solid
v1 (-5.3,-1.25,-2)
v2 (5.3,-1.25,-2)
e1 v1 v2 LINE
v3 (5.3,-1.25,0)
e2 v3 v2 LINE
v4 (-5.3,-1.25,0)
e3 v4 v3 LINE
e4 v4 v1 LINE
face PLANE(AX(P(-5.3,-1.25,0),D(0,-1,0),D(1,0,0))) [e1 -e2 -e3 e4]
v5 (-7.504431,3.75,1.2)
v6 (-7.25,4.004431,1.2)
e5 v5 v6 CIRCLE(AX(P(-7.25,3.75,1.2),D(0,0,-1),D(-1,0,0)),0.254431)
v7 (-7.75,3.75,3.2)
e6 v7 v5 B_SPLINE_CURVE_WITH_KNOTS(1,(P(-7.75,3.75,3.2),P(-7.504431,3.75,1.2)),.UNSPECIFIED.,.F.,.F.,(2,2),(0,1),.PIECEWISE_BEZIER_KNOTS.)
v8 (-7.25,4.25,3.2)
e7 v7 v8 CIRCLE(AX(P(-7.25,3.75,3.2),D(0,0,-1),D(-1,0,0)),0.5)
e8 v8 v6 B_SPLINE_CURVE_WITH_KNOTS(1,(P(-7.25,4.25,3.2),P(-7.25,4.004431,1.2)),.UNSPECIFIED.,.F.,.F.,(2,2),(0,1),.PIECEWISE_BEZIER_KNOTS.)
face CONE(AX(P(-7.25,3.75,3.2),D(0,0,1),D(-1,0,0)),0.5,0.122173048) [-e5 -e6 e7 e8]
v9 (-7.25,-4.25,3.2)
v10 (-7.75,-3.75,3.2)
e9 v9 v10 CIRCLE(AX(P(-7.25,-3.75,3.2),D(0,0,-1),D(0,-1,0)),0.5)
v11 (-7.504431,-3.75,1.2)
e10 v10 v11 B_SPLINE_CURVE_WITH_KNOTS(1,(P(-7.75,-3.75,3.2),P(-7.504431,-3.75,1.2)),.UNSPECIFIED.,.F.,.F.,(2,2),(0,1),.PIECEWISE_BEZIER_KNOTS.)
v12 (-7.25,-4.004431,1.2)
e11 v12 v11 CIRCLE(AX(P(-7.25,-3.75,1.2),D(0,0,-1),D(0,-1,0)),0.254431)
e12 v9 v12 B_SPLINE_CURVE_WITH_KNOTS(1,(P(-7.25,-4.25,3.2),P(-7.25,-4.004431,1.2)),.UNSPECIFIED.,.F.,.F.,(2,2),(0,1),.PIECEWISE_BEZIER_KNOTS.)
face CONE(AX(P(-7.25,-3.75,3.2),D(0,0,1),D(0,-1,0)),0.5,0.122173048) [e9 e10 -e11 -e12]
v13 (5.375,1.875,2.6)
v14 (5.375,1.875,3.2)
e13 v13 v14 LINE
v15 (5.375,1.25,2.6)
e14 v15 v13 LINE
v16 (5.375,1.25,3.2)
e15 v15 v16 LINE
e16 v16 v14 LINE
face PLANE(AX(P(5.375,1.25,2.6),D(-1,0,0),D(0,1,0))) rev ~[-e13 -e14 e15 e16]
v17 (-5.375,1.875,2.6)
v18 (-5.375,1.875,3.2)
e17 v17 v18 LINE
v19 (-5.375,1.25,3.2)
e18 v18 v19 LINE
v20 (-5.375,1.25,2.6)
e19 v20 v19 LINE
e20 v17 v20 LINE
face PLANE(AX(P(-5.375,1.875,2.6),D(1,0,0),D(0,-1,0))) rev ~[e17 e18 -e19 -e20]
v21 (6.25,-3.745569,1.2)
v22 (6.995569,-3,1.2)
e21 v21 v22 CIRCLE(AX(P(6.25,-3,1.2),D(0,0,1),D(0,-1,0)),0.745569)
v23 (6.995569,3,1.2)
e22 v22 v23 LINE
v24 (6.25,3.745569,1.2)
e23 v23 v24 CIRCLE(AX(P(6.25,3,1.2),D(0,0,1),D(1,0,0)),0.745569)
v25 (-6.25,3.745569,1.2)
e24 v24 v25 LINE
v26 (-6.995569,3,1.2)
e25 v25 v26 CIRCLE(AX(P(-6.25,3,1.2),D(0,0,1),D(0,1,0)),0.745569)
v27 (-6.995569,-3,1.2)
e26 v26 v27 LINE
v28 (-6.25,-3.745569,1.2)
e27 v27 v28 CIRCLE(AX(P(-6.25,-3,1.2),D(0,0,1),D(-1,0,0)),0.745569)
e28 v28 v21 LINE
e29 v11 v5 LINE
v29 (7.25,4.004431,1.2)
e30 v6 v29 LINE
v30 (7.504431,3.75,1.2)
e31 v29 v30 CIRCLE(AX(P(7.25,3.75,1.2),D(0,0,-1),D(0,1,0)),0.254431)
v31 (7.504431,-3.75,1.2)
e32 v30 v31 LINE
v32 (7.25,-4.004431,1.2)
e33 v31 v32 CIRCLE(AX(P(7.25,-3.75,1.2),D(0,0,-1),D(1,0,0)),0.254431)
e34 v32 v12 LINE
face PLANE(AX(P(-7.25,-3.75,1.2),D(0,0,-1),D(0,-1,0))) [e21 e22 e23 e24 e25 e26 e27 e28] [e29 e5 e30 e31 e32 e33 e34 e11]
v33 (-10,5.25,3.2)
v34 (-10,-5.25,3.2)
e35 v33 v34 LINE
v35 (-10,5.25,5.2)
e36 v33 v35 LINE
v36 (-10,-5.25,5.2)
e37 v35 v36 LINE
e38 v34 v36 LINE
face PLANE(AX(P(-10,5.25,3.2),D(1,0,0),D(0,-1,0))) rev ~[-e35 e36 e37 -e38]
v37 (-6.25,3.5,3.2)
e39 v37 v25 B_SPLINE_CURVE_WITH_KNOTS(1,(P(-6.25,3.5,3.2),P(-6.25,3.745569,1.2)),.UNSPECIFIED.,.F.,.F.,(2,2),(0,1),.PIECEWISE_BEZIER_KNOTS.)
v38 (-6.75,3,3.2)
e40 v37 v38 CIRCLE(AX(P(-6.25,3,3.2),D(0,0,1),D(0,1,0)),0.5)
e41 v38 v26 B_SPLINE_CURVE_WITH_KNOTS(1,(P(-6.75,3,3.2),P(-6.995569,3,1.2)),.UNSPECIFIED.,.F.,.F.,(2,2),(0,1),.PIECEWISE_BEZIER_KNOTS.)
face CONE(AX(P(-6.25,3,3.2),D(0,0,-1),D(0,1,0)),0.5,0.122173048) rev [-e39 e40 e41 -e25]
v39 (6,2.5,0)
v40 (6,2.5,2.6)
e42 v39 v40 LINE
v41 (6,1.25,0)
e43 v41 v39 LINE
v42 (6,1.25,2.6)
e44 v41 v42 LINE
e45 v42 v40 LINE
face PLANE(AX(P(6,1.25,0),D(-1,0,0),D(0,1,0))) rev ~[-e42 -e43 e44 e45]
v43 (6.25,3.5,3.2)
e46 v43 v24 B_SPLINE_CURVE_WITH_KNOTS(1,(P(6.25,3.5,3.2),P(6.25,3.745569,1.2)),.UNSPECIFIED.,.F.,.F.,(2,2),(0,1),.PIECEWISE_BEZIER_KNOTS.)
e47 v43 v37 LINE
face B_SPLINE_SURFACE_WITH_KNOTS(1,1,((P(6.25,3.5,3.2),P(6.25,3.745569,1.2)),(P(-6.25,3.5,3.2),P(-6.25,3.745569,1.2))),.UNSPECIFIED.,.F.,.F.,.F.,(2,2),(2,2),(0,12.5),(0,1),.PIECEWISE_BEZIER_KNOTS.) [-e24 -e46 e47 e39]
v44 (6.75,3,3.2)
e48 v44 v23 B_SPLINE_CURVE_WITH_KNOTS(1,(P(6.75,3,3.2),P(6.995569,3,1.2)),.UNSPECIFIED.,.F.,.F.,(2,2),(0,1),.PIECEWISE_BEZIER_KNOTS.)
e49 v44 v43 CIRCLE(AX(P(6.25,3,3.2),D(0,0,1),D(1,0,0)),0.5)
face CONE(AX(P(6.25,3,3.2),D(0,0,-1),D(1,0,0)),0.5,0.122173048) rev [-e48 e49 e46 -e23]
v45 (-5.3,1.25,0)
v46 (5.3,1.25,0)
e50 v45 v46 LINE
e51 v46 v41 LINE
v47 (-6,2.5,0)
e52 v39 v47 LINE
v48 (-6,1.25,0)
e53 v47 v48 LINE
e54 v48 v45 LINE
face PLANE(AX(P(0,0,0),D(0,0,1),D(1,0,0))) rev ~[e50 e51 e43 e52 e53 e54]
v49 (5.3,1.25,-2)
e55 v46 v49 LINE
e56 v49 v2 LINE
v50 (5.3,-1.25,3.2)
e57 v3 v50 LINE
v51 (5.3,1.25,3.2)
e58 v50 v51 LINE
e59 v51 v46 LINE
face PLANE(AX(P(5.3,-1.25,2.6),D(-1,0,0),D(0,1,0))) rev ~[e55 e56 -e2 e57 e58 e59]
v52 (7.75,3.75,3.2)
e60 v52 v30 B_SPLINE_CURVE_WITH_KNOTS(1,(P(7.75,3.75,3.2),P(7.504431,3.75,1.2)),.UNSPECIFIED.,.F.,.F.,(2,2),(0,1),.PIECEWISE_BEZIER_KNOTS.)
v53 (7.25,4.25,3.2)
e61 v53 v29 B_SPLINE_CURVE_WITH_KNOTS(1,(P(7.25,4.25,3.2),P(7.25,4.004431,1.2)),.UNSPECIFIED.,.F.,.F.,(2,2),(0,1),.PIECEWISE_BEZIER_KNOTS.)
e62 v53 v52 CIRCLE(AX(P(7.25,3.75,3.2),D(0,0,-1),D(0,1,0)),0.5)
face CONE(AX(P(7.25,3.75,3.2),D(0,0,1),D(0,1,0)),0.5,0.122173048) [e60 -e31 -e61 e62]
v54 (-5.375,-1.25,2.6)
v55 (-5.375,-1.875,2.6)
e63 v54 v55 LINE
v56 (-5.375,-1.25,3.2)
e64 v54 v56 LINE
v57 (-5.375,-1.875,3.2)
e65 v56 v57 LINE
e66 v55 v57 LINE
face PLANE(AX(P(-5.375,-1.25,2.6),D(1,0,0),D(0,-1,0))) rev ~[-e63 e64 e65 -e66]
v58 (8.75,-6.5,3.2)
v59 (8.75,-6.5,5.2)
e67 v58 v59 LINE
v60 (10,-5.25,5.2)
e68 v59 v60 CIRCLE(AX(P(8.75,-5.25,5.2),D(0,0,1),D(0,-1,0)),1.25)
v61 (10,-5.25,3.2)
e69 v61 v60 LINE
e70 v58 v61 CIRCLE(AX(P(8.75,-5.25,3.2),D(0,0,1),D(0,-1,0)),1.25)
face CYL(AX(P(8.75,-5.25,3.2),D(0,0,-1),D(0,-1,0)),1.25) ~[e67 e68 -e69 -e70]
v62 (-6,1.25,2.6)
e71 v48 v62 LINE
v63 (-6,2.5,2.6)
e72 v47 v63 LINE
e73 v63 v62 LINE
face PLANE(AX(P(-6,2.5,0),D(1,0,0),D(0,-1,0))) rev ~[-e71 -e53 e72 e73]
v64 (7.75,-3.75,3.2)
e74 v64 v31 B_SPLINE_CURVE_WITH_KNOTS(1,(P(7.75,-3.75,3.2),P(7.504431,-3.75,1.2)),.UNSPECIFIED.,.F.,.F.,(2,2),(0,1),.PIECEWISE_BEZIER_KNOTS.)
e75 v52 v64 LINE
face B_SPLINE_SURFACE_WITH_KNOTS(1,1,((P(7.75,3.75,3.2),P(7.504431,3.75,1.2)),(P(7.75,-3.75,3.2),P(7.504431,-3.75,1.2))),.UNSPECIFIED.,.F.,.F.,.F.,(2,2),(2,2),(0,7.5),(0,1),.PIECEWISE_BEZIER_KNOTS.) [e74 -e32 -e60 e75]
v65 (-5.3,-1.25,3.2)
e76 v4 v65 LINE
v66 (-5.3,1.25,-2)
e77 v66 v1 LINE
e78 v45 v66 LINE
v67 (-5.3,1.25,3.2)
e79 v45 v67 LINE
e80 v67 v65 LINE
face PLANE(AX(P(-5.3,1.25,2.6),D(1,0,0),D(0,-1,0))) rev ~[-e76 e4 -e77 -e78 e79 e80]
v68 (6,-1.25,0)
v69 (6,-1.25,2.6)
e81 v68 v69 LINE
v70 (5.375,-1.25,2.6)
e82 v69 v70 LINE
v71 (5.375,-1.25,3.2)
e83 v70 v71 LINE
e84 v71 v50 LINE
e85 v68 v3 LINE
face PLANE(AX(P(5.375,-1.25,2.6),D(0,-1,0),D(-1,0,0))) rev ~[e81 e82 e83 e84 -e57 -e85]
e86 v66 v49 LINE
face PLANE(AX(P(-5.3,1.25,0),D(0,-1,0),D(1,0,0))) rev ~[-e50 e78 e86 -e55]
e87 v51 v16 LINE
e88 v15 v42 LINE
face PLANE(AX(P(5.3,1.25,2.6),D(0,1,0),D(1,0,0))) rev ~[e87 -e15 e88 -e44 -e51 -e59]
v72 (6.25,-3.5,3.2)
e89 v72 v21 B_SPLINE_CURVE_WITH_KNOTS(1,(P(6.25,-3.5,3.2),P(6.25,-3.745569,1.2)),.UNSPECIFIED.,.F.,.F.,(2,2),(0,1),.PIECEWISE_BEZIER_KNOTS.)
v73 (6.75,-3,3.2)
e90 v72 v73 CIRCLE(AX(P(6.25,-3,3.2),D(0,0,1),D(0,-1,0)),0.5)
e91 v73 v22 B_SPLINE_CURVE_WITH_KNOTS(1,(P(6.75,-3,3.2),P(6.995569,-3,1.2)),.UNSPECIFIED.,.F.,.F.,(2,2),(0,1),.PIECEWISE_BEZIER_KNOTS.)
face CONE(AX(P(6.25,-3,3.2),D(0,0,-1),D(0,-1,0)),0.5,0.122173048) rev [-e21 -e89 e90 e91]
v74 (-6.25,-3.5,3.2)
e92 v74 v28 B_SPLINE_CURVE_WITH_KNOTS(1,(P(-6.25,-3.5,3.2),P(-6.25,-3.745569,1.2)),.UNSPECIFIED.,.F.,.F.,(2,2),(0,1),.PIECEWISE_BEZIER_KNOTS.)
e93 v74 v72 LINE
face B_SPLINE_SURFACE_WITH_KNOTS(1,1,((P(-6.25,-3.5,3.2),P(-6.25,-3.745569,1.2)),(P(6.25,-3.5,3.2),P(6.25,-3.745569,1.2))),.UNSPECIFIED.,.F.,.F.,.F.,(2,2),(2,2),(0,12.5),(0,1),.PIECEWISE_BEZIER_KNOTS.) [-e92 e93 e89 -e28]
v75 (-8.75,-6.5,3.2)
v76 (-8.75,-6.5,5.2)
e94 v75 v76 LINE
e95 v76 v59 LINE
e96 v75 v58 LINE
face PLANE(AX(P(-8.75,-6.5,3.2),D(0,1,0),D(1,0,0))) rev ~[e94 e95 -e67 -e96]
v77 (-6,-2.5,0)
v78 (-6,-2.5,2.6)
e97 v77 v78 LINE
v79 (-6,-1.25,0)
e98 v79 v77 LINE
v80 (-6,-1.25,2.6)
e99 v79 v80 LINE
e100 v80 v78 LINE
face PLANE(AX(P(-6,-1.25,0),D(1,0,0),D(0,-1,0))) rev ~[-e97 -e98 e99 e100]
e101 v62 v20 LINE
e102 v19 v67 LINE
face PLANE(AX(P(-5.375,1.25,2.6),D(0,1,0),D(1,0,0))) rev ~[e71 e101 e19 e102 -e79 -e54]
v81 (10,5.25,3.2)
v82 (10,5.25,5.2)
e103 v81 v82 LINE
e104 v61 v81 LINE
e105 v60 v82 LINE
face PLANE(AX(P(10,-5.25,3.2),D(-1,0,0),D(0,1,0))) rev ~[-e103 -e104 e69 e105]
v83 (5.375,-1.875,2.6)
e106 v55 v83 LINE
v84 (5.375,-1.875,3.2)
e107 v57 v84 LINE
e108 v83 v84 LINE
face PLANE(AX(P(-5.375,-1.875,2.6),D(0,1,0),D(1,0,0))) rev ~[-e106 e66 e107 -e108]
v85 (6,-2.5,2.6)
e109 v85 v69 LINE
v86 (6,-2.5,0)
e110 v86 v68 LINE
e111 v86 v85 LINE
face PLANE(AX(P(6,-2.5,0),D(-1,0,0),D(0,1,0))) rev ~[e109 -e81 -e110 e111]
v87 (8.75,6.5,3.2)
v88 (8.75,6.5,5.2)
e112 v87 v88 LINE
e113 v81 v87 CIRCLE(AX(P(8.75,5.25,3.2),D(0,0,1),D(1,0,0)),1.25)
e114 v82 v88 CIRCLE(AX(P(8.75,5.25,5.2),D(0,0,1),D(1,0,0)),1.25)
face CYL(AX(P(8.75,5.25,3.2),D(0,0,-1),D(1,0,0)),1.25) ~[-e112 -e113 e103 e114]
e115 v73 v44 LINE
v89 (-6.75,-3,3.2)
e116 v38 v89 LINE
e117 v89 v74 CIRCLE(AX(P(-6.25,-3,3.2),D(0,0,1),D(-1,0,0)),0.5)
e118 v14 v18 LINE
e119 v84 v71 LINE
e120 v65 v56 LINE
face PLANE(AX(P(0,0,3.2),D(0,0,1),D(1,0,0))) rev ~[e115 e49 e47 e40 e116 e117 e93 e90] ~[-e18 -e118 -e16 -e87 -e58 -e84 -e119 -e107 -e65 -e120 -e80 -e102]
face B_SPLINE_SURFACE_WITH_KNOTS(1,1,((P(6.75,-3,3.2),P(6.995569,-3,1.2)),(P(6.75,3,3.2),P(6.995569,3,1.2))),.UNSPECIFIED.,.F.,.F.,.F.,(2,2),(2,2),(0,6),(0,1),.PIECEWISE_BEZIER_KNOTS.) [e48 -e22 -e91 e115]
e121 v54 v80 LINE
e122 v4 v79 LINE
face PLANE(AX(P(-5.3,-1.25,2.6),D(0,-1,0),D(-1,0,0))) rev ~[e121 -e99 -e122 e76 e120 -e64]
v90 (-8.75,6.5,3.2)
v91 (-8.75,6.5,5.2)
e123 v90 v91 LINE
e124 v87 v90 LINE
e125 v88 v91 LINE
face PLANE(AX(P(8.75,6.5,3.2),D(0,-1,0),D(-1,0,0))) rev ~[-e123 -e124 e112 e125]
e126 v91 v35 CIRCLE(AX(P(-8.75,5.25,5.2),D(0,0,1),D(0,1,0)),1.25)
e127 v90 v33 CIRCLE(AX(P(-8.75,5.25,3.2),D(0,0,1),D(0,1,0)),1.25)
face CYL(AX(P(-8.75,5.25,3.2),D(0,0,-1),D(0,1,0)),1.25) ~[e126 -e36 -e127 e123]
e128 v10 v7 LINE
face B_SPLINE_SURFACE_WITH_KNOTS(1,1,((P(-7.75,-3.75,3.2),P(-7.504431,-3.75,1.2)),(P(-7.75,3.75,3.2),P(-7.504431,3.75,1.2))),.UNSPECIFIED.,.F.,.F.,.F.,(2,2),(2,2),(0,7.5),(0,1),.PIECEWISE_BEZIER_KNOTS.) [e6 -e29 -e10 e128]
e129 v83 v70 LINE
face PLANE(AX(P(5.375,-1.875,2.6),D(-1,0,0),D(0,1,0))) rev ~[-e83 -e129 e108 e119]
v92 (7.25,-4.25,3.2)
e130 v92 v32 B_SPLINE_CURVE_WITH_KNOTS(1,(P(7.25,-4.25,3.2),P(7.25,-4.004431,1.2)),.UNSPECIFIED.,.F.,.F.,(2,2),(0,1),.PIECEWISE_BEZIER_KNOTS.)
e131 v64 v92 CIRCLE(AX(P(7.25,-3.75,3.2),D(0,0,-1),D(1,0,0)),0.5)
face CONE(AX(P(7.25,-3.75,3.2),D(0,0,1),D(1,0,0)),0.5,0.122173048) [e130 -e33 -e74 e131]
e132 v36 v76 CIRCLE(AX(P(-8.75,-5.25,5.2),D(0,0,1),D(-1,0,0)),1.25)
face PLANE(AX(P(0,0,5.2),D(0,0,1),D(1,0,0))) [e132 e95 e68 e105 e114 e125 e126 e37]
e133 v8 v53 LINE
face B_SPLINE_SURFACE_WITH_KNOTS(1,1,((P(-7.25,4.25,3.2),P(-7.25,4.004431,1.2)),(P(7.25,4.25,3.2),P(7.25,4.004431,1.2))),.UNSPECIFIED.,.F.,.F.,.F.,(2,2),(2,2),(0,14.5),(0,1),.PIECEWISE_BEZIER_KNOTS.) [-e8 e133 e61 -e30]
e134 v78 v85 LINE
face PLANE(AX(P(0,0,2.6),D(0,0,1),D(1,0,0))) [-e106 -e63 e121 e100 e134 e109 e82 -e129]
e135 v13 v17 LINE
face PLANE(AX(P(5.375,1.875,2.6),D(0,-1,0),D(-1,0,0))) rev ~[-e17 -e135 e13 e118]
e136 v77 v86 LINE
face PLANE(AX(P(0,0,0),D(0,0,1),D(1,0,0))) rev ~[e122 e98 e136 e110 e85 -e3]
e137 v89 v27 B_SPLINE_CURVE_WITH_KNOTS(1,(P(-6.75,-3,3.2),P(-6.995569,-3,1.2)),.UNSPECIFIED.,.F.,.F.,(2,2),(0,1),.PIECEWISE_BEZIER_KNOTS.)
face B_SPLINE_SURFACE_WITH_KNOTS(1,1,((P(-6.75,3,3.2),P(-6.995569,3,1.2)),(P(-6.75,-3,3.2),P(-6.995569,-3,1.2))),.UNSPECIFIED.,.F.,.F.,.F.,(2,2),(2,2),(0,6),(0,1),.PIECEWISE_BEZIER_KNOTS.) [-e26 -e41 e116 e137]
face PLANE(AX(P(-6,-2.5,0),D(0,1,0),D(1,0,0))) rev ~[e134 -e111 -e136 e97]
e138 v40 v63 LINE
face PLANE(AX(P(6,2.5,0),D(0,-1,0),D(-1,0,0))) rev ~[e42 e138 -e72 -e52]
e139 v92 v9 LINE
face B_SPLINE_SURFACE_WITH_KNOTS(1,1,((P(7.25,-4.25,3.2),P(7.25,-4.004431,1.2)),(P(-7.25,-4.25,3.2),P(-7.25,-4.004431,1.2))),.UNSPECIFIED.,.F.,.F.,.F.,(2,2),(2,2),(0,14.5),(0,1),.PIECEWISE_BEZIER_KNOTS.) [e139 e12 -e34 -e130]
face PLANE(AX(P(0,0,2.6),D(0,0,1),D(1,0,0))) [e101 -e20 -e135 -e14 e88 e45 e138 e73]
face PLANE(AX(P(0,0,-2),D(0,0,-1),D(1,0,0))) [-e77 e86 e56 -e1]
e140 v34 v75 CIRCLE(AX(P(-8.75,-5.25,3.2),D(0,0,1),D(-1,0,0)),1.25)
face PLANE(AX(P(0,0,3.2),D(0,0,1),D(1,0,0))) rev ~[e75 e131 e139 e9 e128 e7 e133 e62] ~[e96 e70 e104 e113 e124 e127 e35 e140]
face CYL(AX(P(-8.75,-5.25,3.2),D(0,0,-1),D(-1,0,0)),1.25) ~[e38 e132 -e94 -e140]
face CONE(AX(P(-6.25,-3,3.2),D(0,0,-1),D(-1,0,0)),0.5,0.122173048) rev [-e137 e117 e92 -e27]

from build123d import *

# Parameters (mm, degrees)
F1_DEPTH = 2.6
F2_W     = 10.6
F2_H     = 2.5
F3_DEPTH = 2
F5_DEPTH = 0.6
F7_DEPTH = 2
F9_DEPTH = 2
F9_TAPER = 7


# Not quite as in the source:
# - a feature names something its author has since deleted; it is built from what else it names


with BuildPart() as f1:
    # F0 (on Top) → F1 (new body)
    with BuildSketch(Plane.XY):
        Polygon((6, 2.5), (-6, 2.5), (-6, 1.25), (-5.3, 1.25), (-5.3, -1.25), (-6, -1.25), (-6, -2.5), (6, -2.5), (6, -1.25), (5.3, -1.25), (5.3, 1.25), (6, 1.25), align=None)
    extrude(amount=F1_DEPTH)

    # F2 (on face) → F3 (join)
    with BuildSketch(Plane(origin=(0, 0, 0), x_dir=(1, 0, 0), z_dir=(0, 0, -1))):
        Rectangle(F2_W, F2_H)
    extrude(amount=F3_DEPTH)

    # F4 (on face) → F5 (join)
    with BuildSketch(Plane.XY.offset(2.6)):
        Polygon((5.375, 1.875), (-5.375, 1.875), (-5.375, 1.25), (-5.3, 1.25), (-5.3, -1.25), (-5.375, -1.25), (-5.375, -1.875), (5.375, -1.875), (5.375, -1.25), (5.3, -1.25), (5.3, 1.25), (5.375, 1.25), align=None)
    extrude(amount=F5_DEPTH)

    # F6 (on face) → F7 (join)
    with BuildSketch(Plane.XY.offset(3.2)):
        with BuildLine():
            Line((8.75, 6.5), (-8.75, 6.5))
            ThreePointArc((-8.75, 6.5), (-9.6338834765, 6.1338834765), (-10, 5.25))
            Line((-10, 5.25), (-10, -5.25))
            ThreePointArc((-10, -5.25), (-9.6338834765, -6.1338834765), (-8.75, -6.5))
            Line((-8.75, -6.5), (8.75, -6.5))
            ThreePointArc((8.75, -6.5), (9.6338834765, -6.1338834765), (10, -5.25))
            Line((10, -5.25), (10, 5.25))
            ThreePointArc((10, 5.25), (9.6338834765, 6.1338834765), (8.75, 6.5))
        make_face()
    extrude(amount=F7_DEPTH)

    # F8 (on face) → F9 (join)
    with BuildSketch(Plane(origin=(0, 0, 3.2), x_dir=(1, 0, 0), z_dir=(0, 0, -1))):
        with BuildLine():
            Line((7.25, 4.25), (-7.25, 4.25))
            ThreePointArc((-7.25, 4.25), (-7.6035533906, 4.1035533906), (-7.75, 3.75))
            Line((-7.75, 3.75), (-7.75, -3.75))
            ThreePointArc((-7.75, -3.75), (-7.6035533906, -4.1035533906), (-7.25, -4.25))
            Line((-7.25, -4.25), (7.25, -4.25))
            ThreePointArc((7.25, -4.25), (7.6035533906, -4.1035533906), (7.75, -3.75))
            Line((7.75, -3.75), (7.75, 3.75))
            ThreePointArc((7.75, 3.75), (7.6035533906, 4.1035533906), (7.25, 4.25))
        make_face()
        with BuildLine():
            ThreePointArc((-6.75, 3), (-6.6035533906, 3.3535533906), (-6.25, 3.5))
            Line((-6.25, 3.5), (6.25, 3.5))
            ThreePointArc((6.25, 3.5), (6.6035533906, 3.3535533906), (6.75, 3))
            Line((6.75, 3), (6.75, -3))
            ThreePointArc((6.75, -3), (6.6035533906, -3.3535533906), (6.25, -3.5))
            Line((6.25, -3.5), (-6.25, -3.5))
            ThreePointArc((-6.25, -3.5), (-6.6035533906, -3.3535533906), (-6.75, -3))
            Line((-6.75, -3), (-6.75, 3))
        make_face(mode=Mode.SUBTRACT)
    extrude(amount=F9_DEPTH, taper=F9_TAPER)


solid = f1.part
